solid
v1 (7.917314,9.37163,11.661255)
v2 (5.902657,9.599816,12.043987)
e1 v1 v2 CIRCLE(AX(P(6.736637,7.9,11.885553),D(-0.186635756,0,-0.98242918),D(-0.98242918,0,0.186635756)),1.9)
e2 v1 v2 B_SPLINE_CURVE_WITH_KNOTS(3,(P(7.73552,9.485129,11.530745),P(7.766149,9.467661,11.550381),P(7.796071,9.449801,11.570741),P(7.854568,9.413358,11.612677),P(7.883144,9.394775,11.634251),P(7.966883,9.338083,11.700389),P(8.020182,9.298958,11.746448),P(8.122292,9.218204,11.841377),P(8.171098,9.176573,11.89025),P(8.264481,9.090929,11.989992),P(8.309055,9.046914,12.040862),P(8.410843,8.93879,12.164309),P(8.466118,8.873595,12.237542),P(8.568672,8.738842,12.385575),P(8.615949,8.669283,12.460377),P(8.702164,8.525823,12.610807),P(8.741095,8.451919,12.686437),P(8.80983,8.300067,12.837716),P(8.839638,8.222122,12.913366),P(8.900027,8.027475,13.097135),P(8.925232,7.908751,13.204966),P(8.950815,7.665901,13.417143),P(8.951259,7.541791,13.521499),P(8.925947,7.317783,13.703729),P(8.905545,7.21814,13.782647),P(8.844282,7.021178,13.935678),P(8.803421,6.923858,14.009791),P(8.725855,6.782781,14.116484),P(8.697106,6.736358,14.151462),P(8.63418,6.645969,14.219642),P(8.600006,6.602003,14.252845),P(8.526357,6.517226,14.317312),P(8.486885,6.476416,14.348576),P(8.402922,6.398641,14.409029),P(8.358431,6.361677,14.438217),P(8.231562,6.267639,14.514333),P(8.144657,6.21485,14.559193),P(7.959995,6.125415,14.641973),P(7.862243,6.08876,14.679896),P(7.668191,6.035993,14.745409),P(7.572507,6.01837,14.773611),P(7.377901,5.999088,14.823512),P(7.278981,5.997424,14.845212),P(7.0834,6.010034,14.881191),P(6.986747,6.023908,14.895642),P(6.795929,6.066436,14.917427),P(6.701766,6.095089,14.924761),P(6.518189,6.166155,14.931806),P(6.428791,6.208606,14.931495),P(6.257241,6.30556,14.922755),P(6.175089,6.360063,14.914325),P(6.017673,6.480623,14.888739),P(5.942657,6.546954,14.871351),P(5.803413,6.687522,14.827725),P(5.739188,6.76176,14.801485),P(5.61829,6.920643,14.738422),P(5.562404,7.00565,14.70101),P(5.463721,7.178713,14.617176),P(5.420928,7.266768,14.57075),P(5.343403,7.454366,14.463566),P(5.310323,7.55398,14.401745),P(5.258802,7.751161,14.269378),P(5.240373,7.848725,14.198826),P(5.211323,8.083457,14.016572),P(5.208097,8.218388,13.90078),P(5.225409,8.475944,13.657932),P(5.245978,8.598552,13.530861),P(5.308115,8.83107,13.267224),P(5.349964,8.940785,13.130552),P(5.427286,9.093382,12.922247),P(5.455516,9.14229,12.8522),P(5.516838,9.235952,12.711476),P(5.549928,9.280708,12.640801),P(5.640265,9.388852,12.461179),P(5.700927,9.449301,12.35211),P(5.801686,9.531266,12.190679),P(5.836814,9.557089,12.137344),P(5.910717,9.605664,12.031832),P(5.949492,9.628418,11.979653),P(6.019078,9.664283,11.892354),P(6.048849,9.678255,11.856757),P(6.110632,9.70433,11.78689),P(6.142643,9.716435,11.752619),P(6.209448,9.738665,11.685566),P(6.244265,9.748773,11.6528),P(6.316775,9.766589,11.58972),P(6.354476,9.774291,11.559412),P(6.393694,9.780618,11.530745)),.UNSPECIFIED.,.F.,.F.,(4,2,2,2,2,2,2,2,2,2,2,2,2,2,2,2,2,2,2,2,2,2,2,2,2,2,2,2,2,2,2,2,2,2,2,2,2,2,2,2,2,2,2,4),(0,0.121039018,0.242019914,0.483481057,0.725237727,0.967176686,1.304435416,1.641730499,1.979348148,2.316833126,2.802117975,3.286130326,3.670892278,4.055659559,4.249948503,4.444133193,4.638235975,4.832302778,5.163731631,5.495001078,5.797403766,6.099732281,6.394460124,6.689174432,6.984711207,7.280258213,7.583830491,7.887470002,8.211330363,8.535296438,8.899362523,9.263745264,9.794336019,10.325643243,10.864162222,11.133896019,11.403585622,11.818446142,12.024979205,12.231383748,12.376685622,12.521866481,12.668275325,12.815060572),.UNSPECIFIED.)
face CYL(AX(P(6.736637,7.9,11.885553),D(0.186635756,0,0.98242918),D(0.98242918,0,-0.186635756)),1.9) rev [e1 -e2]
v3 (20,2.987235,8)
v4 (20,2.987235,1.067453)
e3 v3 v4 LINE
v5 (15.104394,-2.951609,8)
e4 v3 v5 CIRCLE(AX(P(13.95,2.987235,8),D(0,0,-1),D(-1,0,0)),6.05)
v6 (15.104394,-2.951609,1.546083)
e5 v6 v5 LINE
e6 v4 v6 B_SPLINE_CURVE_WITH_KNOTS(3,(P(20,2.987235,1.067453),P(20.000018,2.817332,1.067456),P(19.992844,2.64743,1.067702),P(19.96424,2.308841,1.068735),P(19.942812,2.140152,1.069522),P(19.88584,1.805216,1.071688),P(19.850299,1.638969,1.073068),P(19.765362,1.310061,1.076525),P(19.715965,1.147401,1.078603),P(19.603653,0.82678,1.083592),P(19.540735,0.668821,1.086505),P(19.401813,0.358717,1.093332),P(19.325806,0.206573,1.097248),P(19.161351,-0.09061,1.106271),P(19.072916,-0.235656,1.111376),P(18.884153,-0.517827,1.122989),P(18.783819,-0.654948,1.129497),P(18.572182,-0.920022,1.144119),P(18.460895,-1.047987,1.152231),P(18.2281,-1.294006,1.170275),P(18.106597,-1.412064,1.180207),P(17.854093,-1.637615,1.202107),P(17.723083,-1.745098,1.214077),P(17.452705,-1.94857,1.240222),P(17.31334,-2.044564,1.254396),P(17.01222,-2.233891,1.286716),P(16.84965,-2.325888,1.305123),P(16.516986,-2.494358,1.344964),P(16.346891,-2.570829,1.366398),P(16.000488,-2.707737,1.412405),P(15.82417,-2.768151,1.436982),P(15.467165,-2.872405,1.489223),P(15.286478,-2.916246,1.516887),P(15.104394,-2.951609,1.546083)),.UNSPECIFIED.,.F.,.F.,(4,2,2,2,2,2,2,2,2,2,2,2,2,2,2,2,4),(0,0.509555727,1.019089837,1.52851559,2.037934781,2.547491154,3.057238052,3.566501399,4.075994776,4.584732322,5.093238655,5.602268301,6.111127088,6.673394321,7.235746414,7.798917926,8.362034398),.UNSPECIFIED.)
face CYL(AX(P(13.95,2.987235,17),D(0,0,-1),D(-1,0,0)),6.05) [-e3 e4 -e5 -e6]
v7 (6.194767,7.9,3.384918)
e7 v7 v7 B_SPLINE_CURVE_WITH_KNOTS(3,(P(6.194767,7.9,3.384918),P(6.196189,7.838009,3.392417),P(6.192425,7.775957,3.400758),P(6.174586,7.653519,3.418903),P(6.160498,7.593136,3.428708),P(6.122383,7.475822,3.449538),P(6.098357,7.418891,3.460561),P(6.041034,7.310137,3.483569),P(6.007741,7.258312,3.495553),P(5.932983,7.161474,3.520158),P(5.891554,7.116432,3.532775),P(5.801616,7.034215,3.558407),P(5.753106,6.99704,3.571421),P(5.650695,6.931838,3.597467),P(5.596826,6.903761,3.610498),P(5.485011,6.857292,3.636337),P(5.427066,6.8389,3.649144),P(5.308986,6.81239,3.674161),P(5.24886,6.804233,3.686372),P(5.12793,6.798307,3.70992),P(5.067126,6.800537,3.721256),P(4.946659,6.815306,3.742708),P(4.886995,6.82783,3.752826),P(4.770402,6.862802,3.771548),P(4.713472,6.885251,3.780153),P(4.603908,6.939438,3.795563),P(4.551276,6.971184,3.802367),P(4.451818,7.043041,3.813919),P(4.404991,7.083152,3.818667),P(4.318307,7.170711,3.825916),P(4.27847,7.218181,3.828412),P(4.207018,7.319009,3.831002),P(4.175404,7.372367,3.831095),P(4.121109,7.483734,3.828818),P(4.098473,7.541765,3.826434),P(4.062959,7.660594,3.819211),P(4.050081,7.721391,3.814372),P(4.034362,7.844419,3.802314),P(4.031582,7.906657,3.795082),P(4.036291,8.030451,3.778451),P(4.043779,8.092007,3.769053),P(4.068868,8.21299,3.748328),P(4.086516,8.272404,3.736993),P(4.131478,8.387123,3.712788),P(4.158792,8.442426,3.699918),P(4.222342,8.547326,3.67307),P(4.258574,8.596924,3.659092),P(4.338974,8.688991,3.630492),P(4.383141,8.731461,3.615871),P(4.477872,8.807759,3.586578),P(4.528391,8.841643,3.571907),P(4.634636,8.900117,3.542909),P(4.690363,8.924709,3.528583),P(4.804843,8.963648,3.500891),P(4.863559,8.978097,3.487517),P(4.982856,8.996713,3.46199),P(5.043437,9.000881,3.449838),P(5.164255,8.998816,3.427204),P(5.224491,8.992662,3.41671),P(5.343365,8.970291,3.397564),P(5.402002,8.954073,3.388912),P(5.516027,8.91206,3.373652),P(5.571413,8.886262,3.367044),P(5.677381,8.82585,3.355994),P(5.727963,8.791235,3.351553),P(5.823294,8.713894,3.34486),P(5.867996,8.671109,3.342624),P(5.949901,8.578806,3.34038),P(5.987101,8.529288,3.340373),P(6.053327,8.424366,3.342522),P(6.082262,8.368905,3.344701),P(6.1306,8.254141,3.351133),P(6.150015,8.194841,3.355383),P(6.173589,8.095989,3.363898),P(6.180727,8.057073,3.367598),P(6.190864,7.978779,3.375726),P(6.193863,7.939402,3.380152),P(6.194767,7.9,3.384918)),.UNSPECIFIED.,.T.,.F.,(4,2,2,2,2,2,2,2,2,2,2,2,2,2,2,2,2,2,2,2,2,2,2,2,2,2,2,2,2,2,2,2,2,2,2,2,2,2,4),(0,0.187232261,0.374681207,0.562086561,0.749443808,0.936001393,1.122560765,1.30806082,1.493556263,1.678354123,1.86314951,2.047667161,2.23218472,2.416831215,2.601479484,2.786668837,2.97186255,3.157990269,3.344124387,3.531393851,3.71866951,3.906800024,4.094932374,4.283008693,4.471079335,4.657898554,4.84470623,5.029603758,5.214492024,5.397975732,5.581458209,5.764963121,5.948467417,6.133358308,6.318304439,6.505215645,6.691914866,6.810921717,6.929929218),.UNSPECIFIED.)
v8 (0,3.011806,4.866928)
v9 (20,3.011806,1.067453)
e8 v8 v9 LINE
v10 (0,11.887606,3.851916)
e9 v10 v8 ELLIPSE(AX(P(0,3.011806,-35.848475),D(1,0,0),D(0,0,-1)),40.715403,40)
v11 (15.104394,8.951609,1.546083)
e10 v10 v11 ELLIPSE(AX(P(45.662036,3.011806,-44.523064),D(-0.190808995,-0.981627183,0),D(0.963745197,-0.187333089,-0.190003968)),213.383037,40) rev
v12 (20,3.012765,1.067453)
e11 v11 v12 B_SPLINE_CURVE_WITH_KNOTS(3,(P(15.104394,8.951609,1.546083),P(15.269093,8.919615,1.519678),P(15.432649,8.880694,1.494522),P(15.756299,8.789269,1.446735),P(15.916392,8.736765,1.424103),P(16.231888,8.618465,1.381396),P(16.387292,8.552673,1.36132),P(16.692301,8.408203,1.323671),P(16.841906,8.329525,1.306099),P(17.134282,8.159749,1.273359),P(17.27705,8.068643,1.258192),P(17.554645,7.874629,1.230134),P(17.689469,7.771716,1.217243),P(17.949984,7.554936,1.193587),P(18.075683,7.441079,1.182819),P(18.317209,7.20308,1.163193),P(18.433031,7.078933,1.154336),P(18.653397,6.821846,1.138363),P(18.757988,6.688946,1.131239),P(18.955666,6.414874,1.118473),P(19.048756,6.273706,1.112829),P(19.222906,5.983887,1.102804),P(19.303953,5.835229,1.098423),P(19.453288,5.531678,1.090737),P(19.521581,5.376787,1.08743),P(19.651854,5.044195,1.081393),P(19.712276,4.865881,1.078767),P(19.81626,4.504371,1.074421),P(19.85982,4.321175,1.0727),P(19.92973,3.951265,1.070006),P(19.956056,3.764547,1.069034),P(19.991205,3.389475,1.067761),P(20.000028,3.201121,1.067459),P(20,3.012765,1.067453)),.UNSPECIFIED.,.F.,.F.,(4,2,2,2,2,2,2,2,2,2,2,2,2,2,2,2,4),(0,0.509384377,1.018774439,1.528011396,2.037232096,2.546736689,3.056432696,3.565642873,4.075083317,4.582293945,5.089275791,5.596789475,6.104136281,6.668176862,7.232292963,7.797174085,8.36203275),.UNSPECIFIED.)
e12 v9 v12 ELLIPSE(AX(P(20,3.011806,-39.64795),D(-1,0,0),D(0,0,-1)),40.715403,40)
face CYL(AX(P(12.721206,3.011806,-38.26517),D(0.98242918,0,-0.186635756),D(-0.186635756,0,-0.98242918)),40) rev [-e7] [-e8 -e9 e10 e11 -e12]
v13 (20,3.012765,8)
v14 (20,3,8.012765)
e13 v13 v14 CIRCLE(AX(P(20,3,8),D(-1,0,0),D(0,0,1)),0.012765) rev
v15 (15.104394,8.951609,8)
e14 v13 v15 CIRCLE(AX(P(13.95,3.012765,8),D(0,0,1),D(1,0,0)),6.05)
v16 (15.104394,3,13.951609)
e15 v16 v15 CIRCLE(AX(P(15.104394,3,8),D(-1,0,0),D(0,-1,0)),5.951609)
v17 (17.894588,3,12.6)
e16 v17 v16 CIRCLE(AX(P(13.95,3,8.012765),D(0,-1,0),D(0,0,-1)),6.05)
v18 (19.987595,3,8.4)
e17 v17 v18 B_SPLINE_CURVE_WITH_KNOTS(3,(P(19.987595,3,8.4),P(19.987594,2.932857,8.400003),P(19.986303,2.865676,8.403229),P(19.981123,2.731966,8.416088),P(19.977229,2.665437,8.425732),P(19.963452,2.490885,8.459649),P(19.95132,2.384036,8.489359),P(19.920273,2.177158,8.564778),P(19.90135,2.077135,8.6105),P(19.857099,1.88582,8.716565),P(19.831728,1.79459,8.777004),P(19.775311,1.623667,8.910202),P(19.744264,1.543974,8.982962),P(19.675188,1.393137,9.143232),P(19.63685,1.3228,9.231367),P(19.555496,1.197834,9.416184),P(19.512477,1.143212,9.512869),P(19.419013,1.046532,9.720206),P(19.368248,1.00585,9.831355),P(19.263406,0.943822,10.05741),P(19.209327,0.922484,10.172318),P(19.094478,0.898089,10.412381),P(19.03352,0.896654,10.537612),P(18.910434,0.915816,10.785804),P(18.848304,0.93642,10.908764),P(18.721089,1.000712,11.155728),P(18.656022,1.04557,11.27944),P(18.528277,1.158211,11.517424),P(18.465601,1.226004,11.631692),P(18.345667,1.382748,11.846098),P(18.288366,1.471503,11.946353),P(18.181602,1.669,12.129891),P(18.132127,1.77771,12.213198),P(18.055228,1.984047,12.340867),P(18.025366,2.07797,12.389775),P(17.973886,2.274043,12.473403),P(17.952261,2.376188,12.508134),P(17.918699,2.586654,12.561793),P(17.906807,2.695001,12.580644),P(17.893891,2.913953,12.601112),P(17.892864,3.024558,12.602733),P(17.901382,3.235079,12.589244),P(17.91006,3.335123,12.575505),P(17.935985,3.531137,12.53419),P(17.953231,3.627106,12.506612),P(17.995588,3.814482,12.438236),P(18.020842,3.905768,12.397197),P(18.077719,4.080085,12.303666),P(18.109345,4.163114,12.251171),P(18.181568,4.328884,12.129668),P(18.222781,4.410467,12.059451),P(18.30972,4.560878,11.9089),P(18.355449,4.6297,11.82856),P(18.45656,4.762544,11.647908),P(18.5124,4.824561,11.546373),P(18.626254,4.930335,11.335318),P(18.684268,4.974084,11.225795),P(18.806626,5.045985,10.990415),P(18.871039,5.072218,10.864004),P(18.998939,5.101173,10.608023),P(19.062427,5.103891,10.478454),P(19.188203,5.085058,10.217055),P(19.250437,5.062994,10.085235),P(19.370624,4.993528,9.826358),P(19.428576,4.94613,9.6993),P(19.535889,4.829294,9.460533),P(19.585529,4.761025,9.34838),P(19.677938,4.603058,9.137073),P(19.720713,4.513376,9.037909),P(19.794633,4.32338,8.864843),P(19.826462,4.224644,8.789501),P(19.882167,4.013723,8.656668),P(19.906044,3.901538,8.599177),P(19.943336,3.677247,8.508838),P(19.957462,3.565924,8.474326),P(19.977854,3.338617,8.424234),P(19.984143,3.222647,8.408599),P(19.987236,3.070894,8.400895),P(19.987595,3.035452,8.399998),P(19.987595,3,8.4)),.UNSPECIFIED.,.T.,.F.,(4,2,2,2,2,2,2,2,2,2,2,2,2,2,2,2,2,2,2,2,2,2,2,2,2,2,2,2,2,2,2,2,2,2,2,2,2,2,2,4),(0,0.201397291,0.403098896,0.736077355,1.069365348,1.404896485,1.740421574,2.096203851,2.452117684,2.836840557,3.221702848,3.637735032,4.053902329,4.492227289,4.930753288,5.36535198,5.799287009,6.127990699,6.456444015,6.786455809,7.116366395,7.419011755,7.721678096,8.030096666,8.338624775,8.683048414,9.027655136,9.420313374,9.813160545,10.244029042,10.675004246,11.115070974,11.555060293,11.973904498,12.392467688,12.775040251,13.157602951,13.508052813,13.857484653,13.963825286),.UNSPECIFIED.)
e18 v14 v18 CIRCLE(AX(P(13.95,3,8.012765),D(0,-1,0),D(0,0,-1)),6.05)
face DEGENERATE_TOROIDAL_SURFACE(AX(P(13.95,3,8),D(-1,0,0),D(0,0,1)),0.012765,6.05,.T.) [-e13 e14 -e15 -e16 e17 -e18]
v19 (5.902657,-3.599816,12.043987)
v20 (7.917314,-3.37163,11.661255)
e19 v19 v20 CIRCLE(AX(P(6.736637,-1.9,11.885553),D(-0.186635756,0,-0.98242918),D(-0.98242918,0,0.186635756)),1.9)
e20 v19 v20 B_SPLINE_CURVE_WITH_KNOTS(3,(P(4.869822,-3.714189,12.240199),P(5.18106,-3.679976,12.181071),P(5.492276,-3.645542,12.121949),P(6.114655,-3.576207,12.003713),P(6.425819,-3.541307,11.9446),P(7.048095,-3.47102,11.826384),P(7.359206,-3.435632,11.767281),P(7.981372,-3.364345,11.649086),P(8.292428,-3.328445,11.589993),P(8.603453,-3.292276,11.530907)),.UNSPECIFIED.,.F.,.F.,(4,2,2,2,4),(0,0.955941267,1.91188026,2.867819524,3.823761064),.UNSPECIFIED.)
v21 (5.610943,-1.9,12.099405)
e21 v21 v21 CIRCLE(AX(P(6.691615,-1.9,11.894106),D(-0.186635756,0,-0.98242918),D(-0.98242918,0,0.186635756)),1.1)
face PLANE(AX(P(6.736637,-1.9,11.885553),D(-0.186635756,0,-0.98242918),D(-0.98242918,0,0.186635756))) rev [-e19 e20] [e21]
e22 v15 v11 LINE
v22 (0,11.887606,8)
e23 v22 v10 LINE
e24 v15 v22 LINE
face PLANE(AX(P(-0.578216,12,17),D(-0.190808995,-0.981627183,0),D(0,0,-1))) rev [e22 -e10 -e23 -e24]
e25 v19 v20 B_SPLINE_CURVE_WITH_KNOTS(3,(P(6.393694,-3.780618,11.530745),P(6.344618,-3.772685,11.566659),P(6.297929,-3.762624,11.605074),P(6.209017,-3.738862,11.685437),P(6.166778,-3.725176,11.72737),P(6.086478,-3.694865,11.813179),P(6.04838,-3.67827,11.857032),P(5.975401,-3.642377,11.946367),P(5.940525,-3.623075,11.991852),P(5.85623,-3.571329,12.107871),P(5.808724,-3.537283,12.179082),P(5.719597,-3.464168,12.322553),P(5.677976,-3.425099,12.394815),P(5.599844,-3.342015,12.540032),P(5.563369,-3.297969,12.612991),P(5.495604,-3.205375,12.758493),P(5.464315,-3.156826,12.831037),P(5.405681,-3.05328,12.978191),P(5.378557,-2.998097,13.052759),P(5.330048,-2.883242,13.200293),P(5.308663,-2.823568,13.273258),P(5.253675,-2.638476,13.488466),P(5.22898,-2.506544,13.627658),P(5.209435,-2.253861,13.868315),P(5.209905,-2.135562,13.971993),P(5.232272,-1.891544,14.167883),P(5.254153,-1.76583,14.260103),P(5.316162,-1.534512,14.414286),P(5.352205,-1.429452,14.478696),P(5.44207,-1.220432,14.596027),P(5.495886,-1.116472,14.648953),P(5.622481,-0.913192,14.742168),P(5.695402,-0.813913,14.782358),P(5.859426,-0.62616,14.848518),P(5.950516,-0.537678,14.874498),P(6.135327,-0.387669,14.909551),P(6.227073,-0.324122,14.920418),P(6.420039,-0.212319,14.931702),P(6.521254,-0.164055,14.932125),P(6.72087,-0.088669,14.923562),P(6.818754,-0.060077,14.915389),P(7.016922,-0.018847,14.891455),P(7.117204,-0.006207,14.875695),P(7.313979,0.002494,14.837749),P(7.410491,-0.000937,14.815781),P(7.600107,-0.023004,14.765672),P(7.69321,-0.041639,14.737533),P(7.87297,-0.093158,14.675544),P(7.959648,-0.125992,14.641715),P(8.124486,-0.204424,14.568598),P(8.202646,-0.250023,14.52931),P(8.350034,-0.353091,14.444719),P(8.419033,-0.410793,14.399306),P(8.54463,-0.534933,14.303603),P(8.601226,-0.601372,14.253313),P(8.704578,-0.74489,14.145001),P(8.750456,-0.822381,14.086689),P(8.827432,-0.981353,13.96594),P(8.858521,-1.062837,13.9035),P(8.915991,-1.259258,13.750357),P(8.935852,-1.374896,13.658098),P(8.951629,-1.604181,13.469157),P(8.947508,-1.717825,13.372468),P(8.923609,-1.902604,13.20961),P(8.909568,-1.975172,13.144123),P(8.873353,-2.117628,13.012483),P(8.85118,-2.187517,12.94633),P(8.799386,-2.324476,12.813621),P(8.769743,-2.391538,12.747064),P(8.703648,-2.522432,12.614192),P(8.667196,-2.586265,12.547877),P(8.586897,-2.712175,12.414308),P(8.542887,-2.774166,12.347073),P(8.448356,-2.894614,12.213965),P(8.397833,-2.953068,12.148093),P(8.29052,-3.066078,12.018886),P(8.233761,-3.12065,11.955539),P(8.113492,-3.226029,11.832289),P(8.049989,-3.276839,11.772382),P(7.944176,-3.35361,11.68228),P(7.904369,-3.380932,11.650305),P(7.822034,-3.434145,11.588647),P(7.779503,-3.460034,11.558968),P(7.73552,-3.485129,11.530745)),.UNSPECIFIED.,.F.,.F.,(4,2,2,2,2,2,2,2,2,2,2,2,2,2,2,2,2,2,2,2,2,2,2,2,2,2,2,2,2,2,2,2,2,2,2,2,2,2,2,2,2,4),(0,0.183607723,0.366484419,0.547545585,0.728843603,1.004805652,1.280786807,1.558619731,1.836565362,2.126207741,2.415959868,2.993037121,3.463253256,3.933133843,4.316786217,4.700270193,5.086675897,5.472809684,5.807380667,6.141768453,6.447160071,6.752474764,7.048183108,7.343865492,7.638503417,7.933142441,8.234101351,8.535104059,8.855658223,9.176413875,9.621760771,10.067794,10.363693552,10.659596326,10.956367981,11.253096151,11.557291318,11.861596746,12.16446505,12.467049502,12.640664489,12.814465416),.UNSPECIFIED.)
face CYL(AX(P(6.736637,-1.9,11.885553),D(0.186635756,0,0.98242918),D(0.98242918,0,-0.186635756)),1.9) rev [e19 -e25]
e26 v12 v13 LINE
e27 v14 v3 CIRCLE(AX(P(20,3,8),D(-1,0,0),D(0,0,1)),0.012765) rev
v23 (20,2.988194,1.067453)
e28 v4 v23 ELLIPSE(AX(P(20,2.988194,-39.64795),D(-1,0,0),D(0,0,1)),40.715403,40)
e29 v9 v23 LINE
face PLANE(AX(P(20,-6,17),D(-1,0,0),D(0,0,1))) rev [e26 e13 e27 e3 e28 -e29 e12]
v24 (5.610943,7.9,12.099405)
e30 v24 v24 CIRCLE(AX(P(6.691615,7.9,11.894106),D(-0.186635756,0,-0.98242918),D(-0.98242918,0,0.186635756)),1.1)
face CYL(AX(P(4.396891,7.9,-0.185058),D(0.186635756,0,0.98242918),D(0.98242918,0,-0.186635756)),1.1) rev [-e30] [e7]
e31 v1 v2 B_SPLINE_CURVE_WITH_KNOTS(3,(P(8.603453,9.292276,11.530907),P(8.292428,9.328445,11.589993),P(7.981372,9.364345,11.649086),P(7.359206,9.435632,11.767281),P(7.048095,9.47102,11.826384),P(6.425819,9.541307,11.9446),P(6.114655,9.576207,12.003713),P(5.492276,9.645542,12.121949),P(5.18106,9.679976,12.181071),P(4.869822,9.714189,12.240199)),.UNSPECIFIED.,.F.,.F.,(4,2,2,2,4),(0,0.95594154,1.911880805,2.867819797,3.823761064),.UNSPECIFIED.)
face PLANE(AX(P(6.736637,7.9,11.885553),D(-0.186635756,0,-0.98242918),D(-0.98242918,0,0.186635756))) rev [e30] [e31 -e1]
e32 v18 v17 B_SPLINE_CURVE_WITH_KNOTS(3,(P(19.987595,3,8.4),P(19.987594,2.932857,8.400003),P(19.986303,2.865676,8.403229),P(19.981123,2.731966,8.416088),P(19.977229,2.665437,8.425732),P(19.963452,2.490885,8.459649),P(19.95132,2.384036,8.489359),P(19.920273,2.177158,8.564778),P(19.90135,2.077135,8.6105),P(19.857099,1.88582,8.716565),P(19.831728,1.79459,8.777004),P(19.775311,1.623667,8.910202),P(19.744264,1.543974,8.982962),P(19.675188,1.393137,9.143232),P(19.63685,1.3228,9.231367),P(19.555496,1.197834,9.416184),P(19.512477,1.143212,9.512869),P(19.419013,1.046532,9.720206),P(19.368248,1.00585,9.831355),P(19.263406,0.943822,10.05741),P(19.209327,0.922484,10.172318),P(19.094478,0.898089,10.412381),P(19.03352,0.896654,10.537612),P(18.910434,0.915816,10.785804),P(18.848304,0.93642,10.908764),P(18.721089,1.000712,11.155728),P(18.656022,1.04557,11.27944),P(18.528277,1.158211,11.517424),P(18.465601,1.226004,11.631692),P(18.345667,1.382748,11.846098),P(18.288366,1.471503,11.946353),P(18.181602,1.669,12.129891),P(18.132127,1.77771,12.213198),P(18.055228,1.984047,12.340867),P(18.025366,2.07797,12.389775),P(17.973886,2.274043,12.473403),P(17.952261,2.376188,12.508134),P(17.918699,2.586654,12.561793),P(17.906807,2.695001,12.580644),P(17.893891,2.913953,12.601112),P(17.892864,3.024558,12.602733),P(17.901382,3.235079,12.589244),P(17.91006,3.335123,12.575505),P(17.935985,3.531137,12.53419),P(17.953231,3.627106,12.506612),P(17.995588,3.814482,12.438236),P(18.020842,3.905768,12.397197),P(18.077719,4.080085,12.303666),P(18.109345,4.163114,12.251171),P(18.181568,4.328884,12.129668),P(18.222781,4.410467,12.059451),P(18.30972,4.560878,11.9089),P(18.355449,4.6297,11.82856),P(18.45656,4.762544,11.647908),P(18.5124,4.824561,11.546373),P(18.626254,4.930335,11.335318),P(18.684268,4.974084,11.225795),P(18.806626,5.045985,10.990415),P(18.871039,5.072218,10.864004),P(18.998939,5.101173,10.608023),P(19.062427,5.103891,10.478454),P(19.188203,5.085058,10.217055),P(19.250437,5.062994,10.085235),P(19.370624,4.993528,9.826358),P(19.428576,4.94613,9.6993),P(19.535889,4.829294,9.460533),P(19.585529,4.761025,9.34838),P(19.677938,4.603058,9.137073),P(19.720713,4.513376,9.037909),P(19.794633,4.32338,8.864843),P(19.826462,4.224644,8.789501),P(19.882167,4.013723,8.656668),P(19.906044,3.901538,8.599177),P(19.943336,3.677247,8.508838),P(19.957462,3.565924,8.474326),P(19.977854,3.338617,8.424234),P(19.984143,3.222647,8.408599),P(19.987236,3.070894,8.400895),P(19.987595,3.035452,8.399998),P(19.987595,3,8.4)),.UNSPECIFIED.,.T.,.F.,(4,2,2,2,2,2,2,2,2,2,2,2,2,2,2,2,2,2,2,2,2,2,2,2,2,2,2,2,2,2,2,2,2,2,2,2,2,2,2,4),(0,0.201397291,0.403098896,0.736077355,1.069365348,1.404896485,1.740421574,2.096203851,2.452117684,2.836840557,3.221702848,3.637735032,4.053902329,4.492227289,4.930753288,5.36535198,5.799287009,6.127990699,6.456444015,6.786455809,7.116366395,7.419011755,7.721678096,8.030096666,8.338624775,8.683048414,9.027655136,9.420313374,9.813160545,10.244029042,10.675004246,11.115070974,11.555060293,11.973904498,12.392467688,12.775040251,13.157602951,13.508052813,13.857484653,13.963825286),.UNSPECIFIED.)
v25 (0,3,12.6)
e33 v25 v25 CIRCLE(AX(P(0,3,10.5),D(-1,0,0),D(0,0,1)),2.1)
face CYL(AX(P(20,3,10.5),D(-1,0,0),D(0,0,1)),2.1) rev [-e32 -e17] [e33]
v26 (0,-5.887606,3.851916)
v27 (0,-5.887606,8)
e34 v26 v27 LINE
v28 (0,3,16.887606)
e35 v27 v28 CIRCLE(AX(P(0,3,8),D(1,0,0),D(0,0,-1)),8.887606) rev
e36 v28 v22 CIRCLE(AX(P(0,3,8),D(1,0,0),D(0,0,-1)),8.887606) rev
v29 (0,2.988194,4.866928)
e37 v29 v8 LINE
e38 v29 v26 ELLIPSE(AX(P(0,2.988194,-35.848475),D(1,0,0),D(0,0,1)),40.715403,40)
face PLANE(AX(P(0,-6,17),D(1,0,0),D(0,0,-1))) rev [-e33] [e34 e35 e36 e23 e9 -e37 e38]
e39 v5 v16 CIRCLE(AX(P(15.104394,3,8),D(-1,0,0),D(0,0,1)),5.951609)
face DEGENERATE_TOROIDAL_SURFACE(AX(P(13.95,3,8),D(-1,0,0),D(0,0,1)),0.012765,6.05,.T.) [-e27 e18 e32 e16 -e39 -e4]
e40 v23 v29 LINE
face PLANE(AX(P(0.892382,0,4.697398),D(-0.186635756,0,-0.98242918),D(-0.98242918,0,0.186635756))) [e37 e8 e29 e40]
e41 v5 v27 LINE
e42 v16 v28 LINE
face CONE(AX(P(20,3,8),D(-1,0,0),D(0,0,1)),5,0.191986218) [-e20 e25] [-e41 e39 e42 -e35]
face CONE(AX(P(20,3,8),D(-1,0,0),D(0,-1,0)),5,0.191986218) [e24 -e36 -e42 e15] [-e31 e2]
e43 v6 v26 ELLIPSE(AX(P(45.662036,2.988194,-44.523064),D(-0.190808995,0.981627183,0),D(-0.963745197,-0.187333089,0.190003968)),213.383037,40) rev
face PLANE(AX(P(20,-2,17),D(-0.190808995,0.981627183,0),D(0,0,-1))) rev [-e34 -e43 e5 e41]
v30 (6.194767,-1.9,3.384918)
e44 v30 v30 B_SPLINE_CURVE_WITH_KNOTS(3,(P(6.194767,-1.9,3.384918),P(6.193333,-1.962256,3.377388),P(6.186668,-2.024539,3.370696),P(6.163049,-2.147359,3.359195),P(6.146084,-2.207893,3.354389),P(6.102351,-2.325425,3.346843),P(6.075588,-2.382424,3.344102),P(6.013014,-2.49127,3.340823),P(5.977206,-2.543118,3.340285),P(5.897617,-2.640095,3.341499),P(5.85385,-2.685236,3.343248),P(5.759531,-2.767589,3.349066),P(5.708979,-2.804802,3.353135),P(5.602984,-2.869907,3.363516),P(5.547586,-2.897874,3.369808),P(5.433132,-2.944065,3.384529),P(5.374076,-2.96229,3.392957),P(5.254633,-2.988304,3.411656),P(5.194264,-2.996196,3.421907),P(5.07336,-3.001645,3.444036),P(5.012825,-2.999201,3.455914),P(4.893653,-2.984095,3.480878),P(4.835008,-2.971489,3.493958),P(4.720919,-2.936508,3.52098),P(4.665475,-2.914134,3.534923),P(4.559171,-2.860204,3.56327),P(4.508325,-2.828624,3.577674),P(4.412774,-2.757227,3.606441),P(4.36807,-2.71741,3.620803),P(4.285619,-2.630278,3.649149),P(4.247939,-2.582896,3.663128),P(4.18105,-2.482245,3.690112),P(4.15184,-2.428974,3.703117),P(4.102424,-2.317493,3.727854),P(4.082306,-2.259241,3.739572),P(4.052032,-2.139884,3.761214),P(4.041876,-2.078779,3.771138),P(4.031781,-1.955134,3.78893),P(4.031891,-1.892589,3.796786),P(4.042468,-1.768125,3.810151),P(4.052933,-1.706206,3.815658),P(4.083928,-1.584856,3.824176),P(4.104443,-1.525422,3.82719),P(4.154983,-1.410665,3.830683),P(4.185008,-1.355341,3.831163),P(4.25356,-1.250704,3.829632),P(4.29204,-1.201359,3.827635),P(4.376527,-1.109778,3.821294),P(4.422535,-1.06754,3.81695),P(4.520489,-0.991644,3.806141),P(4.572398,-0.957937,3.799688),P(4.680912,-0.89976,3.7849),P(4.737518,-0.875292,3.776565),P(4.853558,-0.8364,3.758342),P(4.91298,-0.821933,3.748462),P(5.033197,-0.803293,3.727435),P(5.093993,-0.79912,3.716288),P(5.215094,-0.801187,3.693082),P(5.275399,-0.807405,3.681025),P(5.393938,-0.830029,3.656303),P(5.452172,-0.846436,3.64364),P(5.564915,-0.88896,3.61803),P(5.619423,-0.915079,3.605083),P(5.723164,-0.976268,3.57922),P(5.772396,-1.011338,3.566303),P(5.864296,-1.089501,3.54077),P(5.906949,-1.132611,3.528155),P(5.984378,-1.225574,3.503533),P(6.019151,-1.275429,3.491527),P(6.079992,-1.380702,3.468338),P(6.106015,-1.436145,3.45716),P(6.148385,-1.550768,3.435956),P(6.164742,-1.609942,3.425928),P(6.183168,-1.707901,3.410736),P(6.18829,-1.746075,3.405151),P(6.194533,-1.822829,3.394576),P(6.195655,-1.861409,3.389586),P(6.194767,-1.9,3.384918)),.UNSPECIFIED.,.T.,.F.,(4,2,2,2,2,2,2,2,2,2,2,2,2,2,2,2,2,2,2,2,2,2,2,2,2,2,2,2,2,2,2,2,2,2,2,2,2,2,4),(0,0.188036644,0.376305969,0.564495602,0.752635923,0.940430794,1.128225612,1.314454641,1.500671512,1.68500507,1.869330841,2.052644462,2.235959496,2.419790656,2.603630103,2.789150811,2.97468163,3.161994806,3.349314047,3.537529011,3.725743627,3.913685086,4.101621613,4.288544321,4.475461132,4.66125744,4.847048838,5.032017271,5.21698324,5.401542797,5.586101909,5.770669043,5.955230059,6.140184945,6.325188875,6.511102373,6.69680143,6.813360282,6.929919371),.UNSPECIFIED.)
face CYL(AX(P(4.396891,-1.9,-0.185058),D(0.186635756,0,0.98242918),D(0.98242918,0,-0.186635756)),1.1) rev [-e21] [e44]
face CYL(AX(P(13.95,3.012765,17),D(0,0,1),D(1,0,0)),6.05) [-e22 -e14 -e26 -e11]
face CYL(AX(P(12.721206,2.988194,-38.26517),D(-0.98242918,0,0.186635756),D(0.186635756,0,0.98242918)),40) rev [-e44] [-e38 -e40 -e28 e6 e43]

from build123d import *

# Parameters (mm, degrees)
ESQUISSE1_W                  = 20
ESQUISSE1_H                  = 18
BOSS_EXTRU_1_DEPTH           = 17
ENL_V_MAT_EXTRU_1_DEPTH      = 32.827660926
ENL_V_MAT_EXTRU_1_DEPTH_BACK = 32.827660926
ESQUISSE4_W                  = 22.812140382
ESQUISSE4_H                  = 17.8
ENL_V_MAT_EXTRU_3_DEPTH      = 1
CONG_2_R                     = 40
ESQUISSE5_R                  = 2.1
ENL_V_MAT_EXTRU_4_DEPTH      = 29.861739379
CONG_3_R                     = 9
CHANFREIN1_SIZE              = 20.578216064
CHANFREIN1_SIZE_2            = 4
CONG_4_R                     = 6.05
ESQUISSE6_R                  = 1.1
ENL_V_MAT_EXTRU_5_DEPTH      = 252.816113418
ESQUISSE10_R                 = 1.9
ENL_V_MAT_EXTRU_6_DEPTH      = 7.5


# Some blends are built 0.0001 mm under size
with BuildPart() as part:
    # Esquisse1 → Boss.-Extru.1 (new body)
    with BuildSketch(Plane.XY):
        with Locations((10, 3)):
            Rectangle(ESQUISSE1_W, ESQUISSE1_H)
    extrude(amount=BOSS_EXTRU_1_DEPTH)

    # Esquisse2 → Enlèv. mat.-Extru.1 (cut, two sides: drawn at the far end of the back side and taken through both)
    with BuildSketch(Plane(origin=(0, 12, 0), x_dir=(1, 0, 0), z_dir=(0, 1, 0)).offset(-ENL_V_MAT_EXTRU_1_DEPTH_BACK)):
        Polygon((81.461522254, 11.626508335), (20.045630921, -0.0408989), (0, -3.849042594), (0, 0), (0, 62.514319158), (66.24104297, 168.553390377), (147.702565224, 117.665579555), align=None)
    extrude(amount=ENL_V_MAT_EXTRU_1_DEPTH + ENL_V_MAT_EXTRU_1_DEPTH_BACK, mode=Mode.SUBTRACT)

    # Esquisse4 → Enlèv. mat.-Extru.3 (cut)
    with BuildSketch(Plane(origin=(0.705746644, 0, 3.714969257), x_dir=(-0.9824291803850712, 0, 0.1866357562952965), z_dir=(-0.1866357562952965, 0, -0.9824291803850712))):
        with Locations((-8.233262334, 3)):
            Rectangle(ESQUISSE4_W, ESQUISSE4_H)
    extrude(amount=-ENL_V_MAT_EXTRU_3_DEPTH, mode=Mode.SUBTRACT)

    # Congé2
    # the kernel refuses this fillet: 40 mm, written as the material it adds along each edge
    with BuildSketch(Plane(origin=(41.830053891, 11.9, -3.079684565), x_dir=(0, -1, 0), z_dir=(-0.9824291803850712, 0, 0.1866357562952965))) as cong_2_piece_1_section:
        with BuildLine():
            CenterArc((8.888194417, -40), CONG_2_R, 90, 12.838568141)
            Line((0, -1), (0, 0))
            Line((0, 0), (8.888194417, 0))
        make_face()
    cong_2_piece_1 = extrude(amount=64.798673587, mode=Mode.PRIVATE)
    cong_2_piece_1 = split(cong_2_piece_1, bisect_by=Plane(origin=(20, 11.9, -3.079684565), z_dir=(-1, 0, 0)), keep=Keep.TOP, mode=Mode.PRIVATE)
    cong_2_piece_1 = split(cong_2_piece_1, bisect_by=Plane(origin=(0, 11.9, -3.079684565), z_dir=(1, 0, 0)), keep=Keep.TOP, mode=Mode.PRIVATE)
    add(cong_2_piece_1)
    with BuildSketch(Plane(origin=(-21.830053891, -5.9, 9.014064887), x_dir=(-0.1866357562952965, 0, -0.9824291803850712), z_dir=(0.9824291803850712, 0, -0.1866357562952965))) as cong_2_piece_2_section:
        with BuildLine():
            CenterArc((40, 8.888194417), CONG_2_R, 180, 12.838568141)
            Line((0, 8.888194417), (0, 0))
            Line((0, 0), (1, 0))
        make_face()
    cong_2_piece_2 = extrude(amount=64.798673587, mode=Mode.PRIVATE)
    cong_2_piece_2 = split(cong_2_piece_2, bisect_by=Plane(origin=(20, -5.9, 9.014064887), z_dir=(-1, 0, 0)), keep=Keep.TOP, mode=Mode.PRIVATE)
    cong_2_piece_2 = split(cong_2_piece_2, bisect_by=Plane(origin=(0, -5.9, 9.014064887), z_dir=(1, 0, 0)), keep=Keep.TOP, mode=Mode.PRIVATE)
    add(cong_2_piece_2)

    # Esquisse5 → Enlèv. mat.-Extru.4 (cut, through all)
    with BuildSketch(Plane.ZY):
        with Locations((10.5, 3)):
            Circle(ESQUISSE5_R)
    extrude(amount=-ENL_V_MAT_EXTRU_4_DEPTH, mode=Mode.SUBTRACT)

    # Congé3
    cong_3_edges = [part.edges().sort_by_distance(p)[0] for p in [
        (10, 12, 17),
        (10, -6, 17),
    ]]
    fillet(cong_3_edges, radius=CONG_3_R - 0.0001)  # a hair under: the kernel refuses the full size

    # Chanfrein1
    # the kernel refuses this chamfer: 20.578216064, 4 mm, written as the material it takes off along each edge
    with BuildSketch(Plane(origin=(20, -6, -53.417428004), x_dir=(-1, 0, 0), z_dir=(0, 0, 1))) as chanfrein1_piece_1:
        Polygon((CHANFREIN1_SIZE, 0), (0, -CHANFREIN1_SIZE_2), (0, 0), align=None)
    extrude(amount=61.417528004, mode=Mode.SUBTRACT)
    with BuildSketch(Plane(origin=(20, 2.9999, 8.0001), x_dir=(0, -1, 0), z_dir=(0, 0, -1))) as chanfrein1_piece_2:
        Polygon((8.9999, CHANFREIN1_SIZE), (8.9999 - CHANFREIN1_SIZE_2, 0), (8.9999, 0), align=None)
    revolve(axis=Axis((20, 2.9999, 8.0001), (-1, 0, 0)), revolution_arc=90, mode=Mode.SUBTRACT)
    with BuildSketch(Plane(origin=(20, 3.0001, 8.0001), x_dir=(0, 0, 1), z_dir=(0, -1, 0))) as chanfrein1_piece_3:
        Polygon((8.9999, CHANFREIN1_SIZE), (8.9999 - CHANFREIN1_SIZE_2, 0), (8.9999, 0), align=None)
    revolve(axis=Axis((20, 3.0001, 8.0001), (-1, 0, 0)), revolution_arc=90, mode=Mode.SUBTRACT)
    with BuildSketch(Plane(origin=(20, 12, -53.417428004), x_dir=(-1, 0, 0), z_dir=(0, 0, 1))) as chanfrein1_piece_4:
        Polygon((CHANFREIN1_SIZE, 0), (0, CHANFREIN1_SIZE_2), (0, 0), align=None)
    extrude(amount=61.417528004, mode=Mode.SUBTRACT)
    with BuildSketch(Plane(origin=(20, 2.9999, 17), x_dir=(-1, 0, 0), z_dir=(0, 1, 0))) as chanfrein1_piece_5:
        Polygon((CHANFREIN1_SIZE, 0), (0, -CHANFREIN1_SIZE_2), (0, 0), align=None)
    extrude(amount=0.0002, mode=Mode.SUBTRACT)

    # Congé4
    # the kernel refuses this fillet: 6.05 mm, written as the material it takes off along each edge
    with BuildSketch(Plane(origin=(20, -2, -11.718464458), x_dir=(-0.9816271834478701, -0.1908089953754837, 0), z_dir=(0, 0, 1))) as cong_4_piece_1:
        with BuildLine():
            CenterArc((CONG_4_R * 0.824336385818, -CONG_4_R), CONG_4_R, 90, 79)
            Line((-CONG_4_R * 0.157290797629, -CONG_4_R * 0.809191004625), (0, 0))
            Line((0, 0), (CONG_4_R * 0.824336385818, 0))
        make_face()
    extrude(amount=19.718564458, mode=Mode.SUBTRACT)
    with BuildSketch(Plane(origin=(20, 2.9999, 8.0001), x_dir=(0, -1, 0), z_dir=(0, 0, -1))) as cong_4_piece_2:
        with BuildLine():
            CenterArc((4.9999 - CONG_4_R * 0.824336385818, CONG_4_R), CONG_4_R, 270, 79)
            Line((4.9999 - CONG_4_R * 0.824336385818, 0), (4.9999, 0))
            Line((4.9999, 0), (4.9999 + CONG_4_R * 0.157290797629, CONG_4_R * 0.809191004625))
        make_face()
    revolve(axis=Axis((20, 2.9999, 8.0001), (-1, 0, 0)), revolution_arc=90, mode=Mode.SUBTRACT)
    with BuildSketch(Plane(origin=(20, 3.0001, 8.0001), x_dir=(0, 0, 1), z_dir=(0, -1, 0))) as cong_4_piece_3:
        with BuildLine():
            CenterArc((4.9999 - CONG_4_R * 0.824336385818, CONG_4_R), CONG_4_R, 270, 79)
            Line((4.9999 - CONG_4_R * 0.824336385818, 0), (4.9999, 0))
            Line((4.9999, 0), (4.9999 + CONG_4_R * 0.157290797629, CONG_4_R * 0.809191004625))
        make_face()
    revolve(axis=Axis((20, 3.0001, 8.0001), (-1, 0, 0)), revolution_arc=90, mode=Mode.SUBTRACT)
    with BuildSketch(Plane(origin=(20, 8, -11.718464458), x_dir=(-0.9816271834478701, 0.1908089953754837, 0), z_dir=(0, 0, 1))) as cong_4_piece_4:
        with BuildLine():
            CenterArc((CONG_4_R * 0.824336385818, CONG_4_R), CONG_4_R, 191, 79)
            Line((-CONG_4_R * 0.157290797629, CONG_4_R * 0.809191004625), (0, 0))
            Line((0, 0), (CONG_4_R * 0.824336385818, 0))
        make_face()
    extrude(amount=19.718564458, mode=Mode.SUBTRACT)
    with BuildSketch(Plane(origin=(20, 2.9999, 13), x_dir=(-0.9816271834478701, 0, 0.1908089953754837), z_dir=(0, 1, 0))) as cong_4_piece_5:
        with BuildLine():
            CenterArc((CONG_4_R * 0.824336385818, -CONG_4_R), CONG_4_R, 90, 79)
            Line((-CONG_4_R * 0.157290797629, -CONG_4_R * 0.809191004625), (0, 0))
            Line((0, 0), (CONG_4_R * 0.824336385818, 0))
        make_face()
    extrude(amount=0.0002, mode=Mode.SUBTRACT)

    # Esquisse6 → Enlèv. mat.-Extru.5 (cut, through all)
    with BuildSketch(Plane(origin=(247.804103642, 0, -26.276800017), x_dir=(-0.9824291803850712, 0, 0.1866357562952965), z_dir=(-0.1866357562952965, 0, -0.9824291803850712))):
        with Locations(Location((244, 7.9, 0), (0, 0, 180))):
            Circle(ESQUISSE6_R)
        with Locations(Location((244, -1.9, 0), (0, 0, 180))):
            Circle(ESQUISSE6_R)
    extrude(amount=ENL_V_MAT_EXTRU_5_DEPTH, mode=Mode.SUBTRACT)

    # Esquisse10 → Enlèv. mat.-Extru.6 (cut)
    with BuildSketch(Plane(origin=(3.813717133, 0, 20.074968868), x_dir=(-0.9824291803850712, 0, 0.1866357562952965), z_dir=(-0.1866357562952965, 0, -0.9824291803850712))):
        with Locations((-4.4, 7.9)):
            Circle(ESQUISSE10_R)
        with Locations((-4.4, -1.9)):
            Circle(ESQUISSE10_R)
    extrude(amount=ENL_V_MAT_EXTRU_6_DEPTH, mode=Mode.SUBTRACT)


solid = part.part
